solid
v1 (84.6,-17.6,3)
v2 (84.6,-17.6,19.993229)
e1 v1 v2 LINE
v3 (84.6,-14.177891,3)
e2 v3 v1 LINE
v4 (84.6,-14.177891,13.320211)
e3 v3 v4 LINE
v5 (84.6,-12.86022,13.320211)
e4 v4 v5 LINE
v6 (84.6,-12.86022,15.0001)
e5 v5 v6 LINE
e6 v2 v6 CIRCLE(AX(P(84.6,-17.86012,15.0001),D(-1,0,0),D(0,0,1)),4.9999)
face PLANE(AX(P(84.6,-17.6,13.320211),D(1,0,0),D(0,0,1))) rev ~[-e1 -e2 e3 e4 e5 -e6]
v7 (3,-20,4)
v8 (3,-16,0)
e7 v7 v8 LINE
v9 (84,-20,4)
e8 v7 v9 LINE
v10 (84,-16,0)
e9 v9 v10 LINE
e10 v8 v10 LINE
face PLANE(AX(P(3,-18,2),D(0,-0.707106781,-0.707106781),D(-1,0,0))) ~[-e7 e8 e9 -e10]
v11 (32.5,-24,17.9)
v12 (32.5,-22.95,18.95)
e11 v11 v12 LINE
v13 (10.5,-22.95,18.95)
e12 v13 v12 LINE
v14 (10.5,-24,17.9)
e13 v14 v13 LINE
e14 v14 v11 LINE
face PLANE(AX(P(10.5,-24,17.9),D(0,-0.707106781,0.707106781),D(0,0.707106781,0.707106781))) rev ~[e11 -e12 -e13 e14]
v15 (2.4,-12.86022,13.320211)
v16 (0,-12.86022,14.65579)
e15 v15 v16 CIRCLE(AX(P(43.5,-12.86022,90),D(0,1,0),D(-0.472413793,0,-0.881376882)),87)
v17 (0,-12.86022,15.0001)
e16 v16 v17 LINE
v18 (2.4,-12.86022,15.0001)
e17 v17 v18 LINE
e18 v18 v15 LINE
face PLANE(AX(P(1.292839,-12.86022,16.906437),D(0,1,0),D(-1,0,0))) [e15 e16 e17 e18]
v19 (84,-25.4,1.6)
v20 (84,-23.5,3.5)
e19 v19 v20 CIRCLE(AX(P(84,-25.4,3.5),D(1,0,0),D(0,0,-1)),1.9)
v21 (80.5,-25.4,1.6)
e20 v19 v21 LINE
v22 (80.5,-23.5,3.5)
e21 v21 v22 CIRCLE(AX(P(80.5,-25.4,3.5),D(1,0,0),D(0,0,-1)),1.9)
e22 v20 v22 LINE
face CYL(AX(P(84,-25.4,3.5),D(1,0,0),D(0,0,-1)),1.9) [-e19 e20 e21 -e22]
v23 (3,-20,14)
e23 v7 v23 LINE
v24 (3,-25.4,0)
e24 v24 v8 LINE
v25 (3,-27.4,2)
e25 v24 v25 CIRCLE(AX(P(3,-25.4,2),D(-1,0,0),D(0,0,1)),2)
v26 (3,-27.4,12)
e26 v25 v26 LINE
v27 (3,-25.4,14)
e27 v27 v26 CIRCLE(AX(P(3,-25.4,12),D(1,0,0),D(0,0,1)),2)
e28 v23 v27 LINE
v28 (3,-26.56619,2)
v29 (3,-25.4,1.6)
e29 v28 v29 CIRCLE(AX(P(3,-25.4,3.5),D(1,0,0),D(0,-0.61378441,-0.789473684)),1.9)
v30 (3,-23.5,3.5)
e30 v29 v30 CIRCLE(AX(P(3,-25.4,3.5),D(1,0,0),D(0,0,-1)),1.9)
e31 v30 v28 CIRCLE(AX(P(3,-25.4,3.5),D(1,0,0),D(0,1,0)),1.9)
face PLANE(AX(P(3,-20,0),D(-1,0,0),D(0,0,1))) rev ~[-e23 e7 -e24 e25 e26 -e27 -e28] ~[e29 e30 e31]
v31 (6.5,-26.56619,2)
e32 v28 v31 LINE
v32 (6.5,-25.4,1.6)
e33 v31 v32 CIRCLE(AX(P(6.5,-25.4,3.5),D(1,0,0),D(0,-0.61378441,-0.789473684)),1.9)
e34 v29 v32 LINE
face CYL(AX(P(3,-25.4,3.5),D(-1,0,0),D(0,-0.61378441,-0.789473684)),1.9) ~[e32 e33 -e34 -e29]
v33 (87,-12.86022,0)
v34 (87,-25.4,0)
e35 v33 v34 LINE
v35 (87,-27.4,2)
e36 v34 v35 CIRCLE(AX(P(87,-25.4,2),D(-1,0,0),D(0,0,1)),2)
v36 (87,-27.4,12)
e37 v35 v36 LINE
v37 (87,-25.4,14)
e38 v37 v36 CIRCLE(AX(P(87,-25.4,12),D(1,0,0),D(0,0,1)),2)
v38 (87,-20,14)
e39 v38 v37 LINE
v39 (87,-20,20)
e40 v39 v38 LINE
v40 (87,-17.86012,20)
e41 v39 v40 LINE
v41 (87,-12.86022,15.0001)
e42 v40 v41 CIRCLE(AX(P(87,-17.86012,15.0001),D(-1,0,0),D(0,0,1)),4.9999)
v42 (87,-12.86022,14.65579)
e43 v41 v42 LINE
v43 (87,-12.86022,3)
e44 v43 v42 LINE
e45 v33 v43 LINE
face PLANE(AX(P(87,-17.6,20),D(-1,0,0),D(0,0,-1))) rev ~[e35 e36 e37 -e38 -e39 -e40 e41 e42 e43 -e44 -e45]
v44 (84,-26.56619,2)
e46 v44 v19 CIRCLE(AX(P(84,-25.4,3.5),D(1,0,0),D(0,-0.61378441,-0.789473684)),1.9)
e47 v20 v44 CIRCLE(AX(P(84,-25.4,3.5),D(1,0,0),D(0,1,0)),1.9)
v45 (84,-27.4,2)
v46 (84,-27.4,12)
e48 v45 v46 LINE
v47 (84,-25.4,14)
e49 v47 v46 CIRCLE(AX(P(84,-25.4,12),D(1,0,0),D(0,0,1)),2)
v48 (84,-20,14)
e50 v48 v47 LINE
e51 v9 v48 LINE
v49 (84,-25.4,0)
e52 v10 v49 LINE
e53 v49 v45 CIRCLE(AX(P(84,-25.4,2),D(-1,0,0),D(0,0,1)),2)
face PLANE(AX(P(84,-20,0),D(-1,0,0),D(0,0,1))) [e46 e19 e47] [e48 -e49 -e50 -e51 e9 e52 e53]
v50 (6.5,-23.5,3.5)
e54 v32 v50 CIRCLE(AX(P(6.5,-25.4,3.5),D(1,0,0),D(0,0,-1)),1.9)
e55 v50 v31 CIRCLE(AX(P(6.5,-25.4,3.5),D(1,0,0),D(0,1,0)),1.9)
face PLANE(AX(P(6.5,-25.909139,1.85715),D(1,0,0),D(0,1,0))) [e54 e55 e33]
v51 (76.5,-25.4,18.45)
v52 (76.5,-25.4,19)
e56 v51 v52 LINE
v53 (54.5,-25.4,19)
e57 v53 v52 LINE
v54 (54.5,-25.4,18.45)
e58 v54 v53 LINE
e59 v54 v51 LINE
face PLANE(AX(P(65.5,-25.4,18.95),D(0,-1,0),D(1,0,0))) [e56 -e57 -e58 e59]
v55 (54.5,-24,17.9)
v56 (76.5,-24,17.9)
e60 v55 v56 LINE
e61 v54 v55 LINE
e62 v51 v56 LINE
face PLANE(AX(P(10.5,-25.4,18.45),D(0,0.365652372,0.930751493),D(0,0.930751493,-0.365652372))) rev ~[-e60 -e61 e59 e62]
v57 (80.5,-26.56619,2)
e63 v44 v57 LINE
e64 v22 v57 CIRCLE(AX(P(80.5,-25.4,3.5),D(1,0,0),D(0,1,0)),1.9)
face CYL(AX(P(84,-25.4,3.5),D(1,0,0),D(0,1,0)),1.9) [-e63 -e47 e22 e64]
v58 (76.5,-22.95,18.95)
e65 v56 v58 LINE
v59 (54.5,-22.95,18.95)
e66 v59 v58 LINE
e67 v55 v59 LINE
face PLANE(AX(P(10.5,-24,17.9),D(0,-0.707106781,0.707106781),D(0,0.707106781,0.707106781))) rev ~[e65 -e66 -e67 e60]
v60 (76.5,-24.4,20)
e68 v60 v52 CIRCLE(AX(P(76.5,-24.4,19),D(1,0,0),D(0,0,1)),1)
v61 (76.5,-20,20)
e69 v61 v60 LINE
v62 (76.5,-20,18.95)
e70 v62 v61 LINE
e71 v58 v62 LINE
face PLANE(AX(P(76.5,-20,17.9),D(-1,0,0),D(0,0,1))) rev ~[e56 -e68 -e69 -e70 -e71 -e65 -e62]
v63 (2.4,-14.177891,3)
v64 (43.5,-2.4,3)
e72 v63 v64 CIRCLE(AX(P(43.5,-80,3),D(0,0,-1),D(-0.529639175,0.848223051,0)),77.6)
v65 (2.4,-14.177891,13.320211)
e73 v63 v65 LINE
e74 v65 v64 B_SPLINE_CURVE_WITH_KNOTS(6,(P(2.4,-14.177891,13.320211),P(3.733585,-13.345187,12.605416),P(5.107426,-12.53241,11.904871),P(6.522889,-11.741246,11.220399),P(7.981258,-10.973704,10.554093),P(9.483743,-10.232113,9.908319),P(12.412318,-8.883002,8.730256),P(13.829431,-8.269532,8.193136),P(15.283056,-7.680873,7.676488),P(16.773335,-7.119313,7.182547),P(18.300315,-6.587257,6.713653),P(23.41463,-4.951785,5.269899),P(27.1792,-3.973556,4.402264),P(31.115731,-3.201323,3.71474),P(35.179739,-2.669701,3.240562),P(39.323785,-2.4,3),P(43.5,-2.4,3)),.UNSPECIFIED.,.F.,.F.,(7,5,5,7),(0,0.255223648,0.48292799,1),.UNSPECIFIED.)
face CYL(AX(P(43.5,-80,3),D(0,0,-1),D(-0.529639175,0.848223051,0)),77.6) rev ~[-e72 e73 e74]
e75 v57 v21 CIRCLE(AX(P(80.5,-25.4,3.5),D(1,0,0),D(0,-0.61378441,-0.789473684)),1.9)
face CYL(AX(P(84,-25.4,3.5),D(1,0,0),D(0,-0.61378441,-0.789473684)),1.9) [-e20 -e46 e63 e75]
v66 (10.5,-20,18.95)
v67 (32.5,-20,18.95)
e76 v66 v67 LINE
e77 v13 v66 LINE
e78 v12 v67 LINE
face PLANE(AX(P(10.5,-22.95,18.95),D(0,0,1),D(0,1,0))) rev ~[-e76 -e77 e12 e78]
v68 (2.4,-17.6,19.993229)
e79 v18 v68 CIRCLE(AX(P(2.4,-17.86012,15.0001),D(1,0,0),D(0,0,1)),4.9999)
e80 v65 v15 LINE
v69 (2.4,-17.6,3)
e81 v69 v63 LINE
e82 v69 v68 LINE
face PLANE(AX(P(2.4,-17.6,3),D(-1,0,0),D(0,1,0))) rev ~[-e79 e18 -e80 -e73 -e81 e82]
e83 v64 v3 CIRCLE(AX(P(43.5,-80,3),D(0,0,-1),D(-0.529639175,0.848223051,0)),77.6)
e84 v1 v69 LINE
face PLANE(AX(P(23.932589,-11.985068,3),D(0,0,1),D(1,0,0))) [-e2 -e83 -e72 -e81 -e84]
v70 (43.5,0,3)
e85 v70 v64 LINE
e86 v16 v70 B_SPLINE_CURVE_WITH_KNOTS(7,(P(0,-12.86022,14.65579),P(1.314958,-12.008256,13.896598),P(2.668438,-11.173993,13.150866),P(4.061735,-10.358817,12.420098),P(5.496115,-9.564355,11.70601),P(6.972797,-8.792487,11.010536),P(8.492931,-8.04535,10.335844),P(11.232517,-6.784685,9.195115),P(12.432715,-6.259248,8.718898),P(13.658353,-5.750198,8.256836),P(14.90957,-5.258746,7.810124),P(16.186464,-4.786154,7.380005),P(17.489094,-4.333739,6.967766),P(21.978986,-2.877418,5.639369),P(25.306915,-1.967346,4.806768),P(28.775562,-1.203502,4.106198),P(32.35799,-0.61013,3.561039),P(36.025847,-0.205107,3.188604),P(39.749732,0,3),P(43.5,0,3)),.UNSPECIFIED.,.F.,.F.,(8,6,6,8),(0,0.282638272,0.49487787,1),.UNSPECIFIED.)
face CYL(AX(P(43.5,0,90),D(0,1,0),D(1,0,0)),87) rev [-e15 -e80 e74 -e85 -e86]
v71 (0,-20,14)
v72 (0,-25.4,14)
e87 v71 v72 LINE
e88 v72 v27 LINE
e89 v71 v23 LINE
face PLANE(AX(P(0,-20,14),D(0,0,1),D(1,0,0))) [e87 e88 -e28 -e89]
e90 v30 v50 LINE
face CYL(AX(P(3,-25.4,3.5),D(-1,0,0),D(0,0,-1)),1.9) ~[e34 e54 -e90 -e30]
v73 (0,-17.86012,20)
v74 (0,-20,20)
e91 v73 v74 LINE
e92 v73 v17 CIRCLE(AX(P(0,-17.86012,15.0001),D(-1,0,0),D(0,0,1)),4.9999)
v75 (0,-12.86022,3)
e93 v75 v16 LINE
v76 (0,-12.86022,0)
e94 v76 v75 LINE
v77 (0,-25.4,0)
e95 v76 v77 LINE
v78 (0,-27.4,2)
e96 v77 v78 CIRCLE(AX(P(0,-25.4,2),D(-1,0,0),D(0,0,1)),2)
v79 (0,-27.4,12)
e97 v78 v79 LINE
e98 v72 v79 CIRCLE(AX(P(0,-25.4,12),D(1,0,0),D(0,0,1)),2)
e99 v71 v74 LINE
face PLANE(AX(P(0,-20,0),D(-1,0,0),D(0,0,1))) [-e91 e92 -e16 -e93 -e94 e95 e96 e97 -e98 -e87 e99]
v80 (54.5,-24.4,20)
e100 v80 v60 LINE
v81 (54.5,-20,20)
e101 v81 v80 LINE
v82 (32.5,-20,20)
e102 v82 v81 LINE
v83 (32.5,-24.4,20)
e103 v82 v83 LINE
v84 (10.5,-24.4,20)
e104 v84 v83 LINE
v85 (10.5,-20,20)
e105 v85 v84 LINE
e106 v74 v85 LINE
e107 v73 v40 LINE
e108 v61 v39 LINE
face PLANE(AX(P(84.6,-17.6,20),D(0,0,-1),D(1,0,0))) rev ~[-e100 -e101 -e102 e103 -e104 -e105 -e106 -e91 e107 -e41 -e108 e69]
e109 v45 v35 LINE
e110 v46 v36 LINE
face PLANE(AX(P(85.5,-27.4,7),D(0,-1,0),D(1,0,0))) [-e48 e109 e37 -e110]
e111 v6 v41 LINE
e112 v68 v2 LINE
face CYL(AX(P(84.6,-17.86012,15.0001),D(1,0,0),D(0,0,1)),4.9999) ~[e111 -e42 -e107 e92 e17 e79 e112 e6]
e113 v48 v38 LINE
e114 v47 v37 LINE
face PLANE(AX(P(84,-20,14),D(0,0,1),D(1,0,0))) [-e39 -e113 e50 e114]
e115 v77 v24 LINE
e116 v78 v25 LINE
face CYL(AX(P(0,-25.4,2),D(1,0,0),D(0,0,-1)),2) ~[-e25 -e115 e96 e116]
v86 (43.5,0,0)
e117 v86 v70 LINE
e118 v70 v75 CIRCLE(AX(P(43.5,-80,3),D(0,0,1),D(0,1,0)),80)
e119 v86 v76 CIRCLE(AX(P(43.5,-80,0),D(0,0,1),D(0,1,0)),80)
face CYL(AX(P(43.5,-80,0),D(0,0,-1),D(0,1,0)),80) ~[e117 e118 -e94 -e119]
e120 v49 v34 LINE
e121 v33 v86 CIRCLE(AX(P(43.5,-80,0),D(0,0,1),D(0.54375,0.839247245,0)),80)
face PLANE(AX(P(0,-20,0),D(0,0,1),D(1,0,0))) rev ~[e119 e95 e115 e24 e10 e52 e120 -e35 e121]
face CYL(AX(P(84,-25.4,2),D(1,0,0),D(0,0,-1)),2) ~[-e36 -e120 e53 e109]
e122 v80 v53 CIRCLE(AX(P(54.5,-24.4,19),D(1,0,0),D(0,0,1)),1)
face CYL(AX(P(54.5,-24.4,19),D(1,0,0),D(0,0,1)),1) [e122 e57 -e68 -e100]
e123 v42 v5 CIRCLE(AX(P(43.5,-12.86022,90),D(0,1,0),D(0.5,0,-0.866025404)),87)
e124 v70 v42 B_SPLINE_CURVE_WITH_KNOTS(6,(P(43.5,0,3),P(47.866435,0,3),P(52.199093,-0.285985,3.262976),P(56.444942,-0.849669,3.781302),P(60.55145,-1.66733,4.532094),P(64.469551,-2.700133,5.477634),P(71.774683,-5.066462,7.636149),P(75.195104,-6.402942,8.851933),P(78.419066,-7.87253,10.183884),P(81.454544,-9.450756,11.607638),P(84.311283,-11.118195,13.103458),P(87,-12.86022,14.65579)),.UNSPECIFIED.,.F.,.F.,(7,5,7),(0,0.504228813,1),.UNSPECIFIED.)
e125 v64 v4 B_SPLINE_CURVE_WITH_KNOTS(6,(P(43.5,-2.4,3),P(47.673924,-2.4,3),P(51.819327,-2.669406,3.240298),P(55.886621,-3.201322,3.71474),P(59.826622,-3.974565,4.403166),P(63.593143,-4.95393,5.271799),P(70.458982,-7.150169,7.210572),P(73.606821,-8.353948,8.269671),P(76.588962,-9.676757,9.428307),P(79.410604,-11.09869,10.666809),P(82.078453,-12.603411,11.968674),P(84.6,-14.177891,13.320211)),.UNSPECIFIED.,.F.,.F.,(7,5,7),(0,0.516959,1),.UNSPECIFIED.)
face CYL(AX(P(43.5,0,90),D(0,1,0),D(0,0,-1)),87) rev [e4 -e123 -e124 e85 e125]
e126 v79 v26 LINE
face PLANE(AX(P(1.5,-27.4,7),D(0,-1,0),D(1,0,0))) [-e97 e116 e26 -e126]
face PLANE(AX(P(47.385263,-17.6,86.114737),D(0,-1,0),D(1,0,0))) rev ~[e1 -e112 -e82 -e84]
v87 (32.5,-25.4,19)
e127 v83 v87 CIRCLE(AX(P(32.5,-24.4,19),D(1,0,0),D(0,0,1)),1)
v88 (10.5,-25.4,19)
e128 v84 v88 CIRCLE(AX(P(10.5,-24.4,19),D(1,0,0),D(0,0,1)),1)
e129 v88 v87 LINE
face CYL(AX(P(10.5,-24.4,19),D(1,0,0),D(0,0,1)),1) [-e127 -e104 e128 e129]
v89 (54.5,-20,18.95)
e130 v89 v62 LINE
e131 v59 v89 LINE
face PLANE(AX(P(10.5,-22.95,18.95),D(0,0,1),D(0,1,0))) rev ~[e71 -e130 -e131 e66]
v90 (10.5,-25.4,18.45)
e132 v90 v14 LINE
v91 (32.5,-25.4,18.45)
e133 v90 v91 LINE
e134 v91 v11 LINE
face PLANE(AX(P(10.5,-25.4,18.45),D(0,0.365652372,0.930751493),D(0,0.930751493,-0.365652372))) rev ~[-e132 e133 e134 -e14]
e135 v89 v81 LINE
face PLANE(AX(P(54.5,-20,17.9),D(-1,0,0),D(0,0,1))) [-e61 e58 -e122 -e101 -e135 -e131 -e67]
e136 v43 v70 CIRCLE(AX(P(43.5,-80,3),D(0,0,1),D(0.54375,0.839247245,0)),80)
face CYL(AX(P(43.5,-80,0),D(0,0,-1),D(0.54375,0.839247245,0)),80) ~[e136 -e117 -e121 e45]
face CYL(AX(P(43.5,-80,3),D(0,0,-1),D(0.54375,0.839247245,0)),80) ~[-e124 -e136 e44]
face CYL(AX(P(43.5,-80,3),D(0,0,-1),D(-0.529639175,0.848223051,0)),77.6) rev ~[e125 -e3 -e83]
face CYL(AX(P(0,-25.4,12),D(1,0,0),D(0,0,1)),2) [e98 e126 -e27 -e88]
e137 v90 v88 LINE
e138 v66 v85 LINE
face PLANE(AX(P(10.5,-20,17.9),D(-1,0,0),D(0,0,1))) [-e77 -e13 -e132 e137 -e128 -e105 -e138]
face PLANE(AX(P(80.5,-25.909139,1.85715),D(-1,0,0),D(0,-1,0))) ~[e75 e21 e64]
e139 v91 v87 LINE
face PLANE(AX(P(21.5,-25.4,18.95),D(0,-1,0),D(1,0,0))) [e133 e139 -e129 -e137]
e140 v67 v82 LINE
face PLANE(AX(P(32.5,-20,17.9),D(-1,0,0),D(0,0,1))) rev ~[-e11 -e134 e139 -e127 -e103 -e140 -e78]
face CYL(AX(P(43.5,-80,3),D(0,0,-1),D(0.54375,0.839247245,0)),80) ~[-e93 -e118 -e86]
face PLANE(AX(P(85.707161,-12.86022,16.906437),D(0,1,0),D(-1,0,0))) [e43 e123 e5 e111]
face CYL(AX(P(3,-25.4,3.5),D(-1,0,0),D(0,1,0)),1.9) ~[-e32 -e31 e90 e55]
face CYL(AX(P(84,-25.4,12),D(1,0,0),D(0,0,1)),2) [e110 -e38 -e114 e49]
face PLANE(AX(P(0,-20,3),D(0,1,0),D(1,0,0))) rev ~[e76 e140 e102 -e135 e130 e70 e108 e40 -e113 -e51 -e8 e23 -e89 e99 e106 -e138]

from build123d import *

# Parameters (mm, degrees)
F1_DEPTH  = 3
F3_DEPTH  = 17
F5_DEPTH  = 17.6
F6_W      = 3
F6_H      = 14
F7_DEPTH  = 7.4
F8_R      = 2
F6_W_2    = 22
F6_H_2    = 2.1
F9_DEPTH  = 5.4
F10_R     = 1
F12_SIZE  = 4
F14_DEPTH = 3.5
F18_DEPTH = 66
F20_DEPTH = 4.7397795647
F21_F1_R  = 4.9999


# Not quite as in the source:
# - a fillet or chamfer is up to 0.001 mm smaller than in the source, because OpenCascade refuses the exact size


with BuildPart() as f1:
    # F0 (on Top) → F1 (new body)
    with BuildSketch(Plane.XY):
        with BuildLine():
            Line((43.5, -20), (43.5, 0))
            ThreePointArc((43.5, 0), (20.8194176131, -3.2823932686), (0, -12.8602204353))
            Line((0, -12.8602204353), (0, -20))
            Line((0, -20), (43.5, -20))
        make_face()
        with BuildLine():
            ThreePointArc((87, -12.8602204353), (66.1805823869, -3.2823932686), (43.5, 0))
            Line((43.5, 0), (43.5, -20))
            Line((43.5, -20), (87, -20))
            Line((87, -20), (87, -12.8602204353))
        make_face()
    extrude(amount=F1_DEPTH)

    # F2 (on face) → F3 (join)
    with BuildSketch(Plane.XY.offset(3)):
        with BuildLine():
            ThreePointArc((87, -12.8602204353), (43.5, 0), (0, -12.8602204353))
            Line((0, -12.8602204353), (0, -20))
            Line((0, -20), (87, -20))
            Line((87, -20), (87, -12.8602204353))
        make_face()
        with BuildLine():
            Line((84.6, -17.6), (2.4, -17.6))
            Line((2.4, -17.6), (2.4, -14.1778912523))
            ThreePointArc((2.4, -14.1778912523), (43.5, -2.4), (84.6, -14.1778912523))
            Line((84.6, -14.1778912523), (84.6, -17.6))
        make_face(mode=Mode.SUBTRACT)
    extrude(amount=F3_DEPTH)

    # F4 (on Front) → F5 (cut, through all)
    with BuildSketch(Plane.XZ):
        with BuildLine():
            ThreePointArc((130.5, 90), (-18.0182899632, 151.5182899632), (43.5, 3))
            ThreePointArc((43.5, 3), (105.0182899632, 28.4817100368), (130.5, 90))
        make_face()
    extrude(amount=F5_DEPTH, mode=Mode.SUBTRACT)

    # F6 (on face) → F7 (join)
    with BuildSketch(Plane.XZ.offset(20)):
        with Locations((1.5, 7)):
            Rectangle(F6_W, F6_H)
        with Locations((85.5, 7)):
            Rectangle(F6_W, F6_H)
    extrude(amount=F7_DEPTH)

    # F8
    f8_edges = [f1.edges().sort_by_distance(p)[0] for p in [
        (1.5, -27.4, 0),
        (1.5, -27.4, 14),
        (85.5, -27.4, 14),
        (85.5, -27.4, 0),
    ]]
    fillet(f8_edges, radius=F8_R)

    # F6 (on face) → F9 (join)
    with BuildSketch(Plane.XZ.offset(20)):
        with Locations((21.5, 18.95)):
            Rectangle(F6_W_2, F6_H_2)
        with Locations((65.5, 18.95)):
            Rectangle(F6_W_2, F6_H_2)
    extrude(amount=F9_DEPTH)

    # F10
    f10_edges = [f1.edges().sort_by_distance(p)[0] for p in [
        (21.5, -25.4, 20),
        (65.5, -25.4, 20),
    ]]
    fillet(f10_edges, radius=F10_R)

    # F12
    f12_edges = [f1.edges().sort_by_distance(p)[0] for p in [
        (43.5, -20, 0),
    ]]
    chamfer(f12_edges, length=F12_SIZE)

    # F13 (on face) → F14 (join)
    with BuildSketch(Plane.YZ.offset(3)):
        with BuildLine():
            Line((-25.4, 2), (-26.566190379, 2))
            ThreePointArc((-26.566190379, 2), (-26.0164414003, 1.7027799244), (-25.4, 1.6))
            Line((-25.4, 1.6), (-25.4, 2))
        make_face()
        with BuildLine():
            ThreePointArc((-23.5, 3.5), (-26.2349366084, 5.2067163971), (-26.566190379, 2))
            Line((-26.566190379, 2), (-25.4, 2))
            Line((-25.4, 2), (-25.4, 1.6))
            ThreePointArc((-25.4, 1.6), (-24.0564971157, 2.1564971157), (-23.5, 3.5))
        make_face()
    extrude(amount=F14_DEPTH)

    # F17: F1 across plane


with BuildPart() as f1_1:
    add(f1.part)
    add(f1.part.mirror(Plane.YZ.offset(43.5)))

    # F11 (on face) → F18 (cut, through all)
    with BuildSketch(Plane(origin=(10.5, 0, 0), x_dir=(0, -1, 0), z_dir=(-1, 0, 0))):
        Polygon((22.95, 18.95), (20, 18.95), (20, 17.9), (24, 17.9), align=None)
        Polygon((25.4, 17.9), (25.4, 18.45), (24, 17.9), align=None)
    extrude(amount=-F18_DEPTH, mode=Mode.SUBTRACT)

    # F19 (on face) → F20 (join, through all)
    with BuildSketch(Plane(origin=(0, -17.6, 0), x_dir=(-1, 0, 0), z_dir=(0, 1, 0))):
        with BuildLine():
            Line((-84.6, 13.3202112679), (-84.6, 20))
            Line((-84.6, 20), (-87, 20))
            Line((-87, 20), (-87, 14.6557898708))
            ThreePointArc((-87, 14.6557898708), (-85.8052708602, 13.9785289708), (-84.6, 13.3202112679))
        make_face()
        with BuildLine():
            Line((-2.4, 20), (-2.4, 13.3202112679))
            ThreePointArc((-2.4, 13.3202112679), (-1.1947291398, 13.9785289708), (0, 14.6557898708))
            Line((0, 14.6557898708), (0, 20))
            Line((0, 20), (-2.4, 20))
        make_face()
    extrude(amount=F20_DEPTH)

    # F21: fillet of radius 5 on 2 edges, made by hand

    # F21_f1 (radius 5 in the source; OpenCascade refuses exactly that, so slightly less here)
    f21_f1_edges = [f1_1.edges().sort_by_distance(p)[0] for p in [
        (85.8, -12.8602204353, 20),
    ]]
    fillet(f21_f1_edges, radius=F21_F1_R)


solid = f1_1.part
